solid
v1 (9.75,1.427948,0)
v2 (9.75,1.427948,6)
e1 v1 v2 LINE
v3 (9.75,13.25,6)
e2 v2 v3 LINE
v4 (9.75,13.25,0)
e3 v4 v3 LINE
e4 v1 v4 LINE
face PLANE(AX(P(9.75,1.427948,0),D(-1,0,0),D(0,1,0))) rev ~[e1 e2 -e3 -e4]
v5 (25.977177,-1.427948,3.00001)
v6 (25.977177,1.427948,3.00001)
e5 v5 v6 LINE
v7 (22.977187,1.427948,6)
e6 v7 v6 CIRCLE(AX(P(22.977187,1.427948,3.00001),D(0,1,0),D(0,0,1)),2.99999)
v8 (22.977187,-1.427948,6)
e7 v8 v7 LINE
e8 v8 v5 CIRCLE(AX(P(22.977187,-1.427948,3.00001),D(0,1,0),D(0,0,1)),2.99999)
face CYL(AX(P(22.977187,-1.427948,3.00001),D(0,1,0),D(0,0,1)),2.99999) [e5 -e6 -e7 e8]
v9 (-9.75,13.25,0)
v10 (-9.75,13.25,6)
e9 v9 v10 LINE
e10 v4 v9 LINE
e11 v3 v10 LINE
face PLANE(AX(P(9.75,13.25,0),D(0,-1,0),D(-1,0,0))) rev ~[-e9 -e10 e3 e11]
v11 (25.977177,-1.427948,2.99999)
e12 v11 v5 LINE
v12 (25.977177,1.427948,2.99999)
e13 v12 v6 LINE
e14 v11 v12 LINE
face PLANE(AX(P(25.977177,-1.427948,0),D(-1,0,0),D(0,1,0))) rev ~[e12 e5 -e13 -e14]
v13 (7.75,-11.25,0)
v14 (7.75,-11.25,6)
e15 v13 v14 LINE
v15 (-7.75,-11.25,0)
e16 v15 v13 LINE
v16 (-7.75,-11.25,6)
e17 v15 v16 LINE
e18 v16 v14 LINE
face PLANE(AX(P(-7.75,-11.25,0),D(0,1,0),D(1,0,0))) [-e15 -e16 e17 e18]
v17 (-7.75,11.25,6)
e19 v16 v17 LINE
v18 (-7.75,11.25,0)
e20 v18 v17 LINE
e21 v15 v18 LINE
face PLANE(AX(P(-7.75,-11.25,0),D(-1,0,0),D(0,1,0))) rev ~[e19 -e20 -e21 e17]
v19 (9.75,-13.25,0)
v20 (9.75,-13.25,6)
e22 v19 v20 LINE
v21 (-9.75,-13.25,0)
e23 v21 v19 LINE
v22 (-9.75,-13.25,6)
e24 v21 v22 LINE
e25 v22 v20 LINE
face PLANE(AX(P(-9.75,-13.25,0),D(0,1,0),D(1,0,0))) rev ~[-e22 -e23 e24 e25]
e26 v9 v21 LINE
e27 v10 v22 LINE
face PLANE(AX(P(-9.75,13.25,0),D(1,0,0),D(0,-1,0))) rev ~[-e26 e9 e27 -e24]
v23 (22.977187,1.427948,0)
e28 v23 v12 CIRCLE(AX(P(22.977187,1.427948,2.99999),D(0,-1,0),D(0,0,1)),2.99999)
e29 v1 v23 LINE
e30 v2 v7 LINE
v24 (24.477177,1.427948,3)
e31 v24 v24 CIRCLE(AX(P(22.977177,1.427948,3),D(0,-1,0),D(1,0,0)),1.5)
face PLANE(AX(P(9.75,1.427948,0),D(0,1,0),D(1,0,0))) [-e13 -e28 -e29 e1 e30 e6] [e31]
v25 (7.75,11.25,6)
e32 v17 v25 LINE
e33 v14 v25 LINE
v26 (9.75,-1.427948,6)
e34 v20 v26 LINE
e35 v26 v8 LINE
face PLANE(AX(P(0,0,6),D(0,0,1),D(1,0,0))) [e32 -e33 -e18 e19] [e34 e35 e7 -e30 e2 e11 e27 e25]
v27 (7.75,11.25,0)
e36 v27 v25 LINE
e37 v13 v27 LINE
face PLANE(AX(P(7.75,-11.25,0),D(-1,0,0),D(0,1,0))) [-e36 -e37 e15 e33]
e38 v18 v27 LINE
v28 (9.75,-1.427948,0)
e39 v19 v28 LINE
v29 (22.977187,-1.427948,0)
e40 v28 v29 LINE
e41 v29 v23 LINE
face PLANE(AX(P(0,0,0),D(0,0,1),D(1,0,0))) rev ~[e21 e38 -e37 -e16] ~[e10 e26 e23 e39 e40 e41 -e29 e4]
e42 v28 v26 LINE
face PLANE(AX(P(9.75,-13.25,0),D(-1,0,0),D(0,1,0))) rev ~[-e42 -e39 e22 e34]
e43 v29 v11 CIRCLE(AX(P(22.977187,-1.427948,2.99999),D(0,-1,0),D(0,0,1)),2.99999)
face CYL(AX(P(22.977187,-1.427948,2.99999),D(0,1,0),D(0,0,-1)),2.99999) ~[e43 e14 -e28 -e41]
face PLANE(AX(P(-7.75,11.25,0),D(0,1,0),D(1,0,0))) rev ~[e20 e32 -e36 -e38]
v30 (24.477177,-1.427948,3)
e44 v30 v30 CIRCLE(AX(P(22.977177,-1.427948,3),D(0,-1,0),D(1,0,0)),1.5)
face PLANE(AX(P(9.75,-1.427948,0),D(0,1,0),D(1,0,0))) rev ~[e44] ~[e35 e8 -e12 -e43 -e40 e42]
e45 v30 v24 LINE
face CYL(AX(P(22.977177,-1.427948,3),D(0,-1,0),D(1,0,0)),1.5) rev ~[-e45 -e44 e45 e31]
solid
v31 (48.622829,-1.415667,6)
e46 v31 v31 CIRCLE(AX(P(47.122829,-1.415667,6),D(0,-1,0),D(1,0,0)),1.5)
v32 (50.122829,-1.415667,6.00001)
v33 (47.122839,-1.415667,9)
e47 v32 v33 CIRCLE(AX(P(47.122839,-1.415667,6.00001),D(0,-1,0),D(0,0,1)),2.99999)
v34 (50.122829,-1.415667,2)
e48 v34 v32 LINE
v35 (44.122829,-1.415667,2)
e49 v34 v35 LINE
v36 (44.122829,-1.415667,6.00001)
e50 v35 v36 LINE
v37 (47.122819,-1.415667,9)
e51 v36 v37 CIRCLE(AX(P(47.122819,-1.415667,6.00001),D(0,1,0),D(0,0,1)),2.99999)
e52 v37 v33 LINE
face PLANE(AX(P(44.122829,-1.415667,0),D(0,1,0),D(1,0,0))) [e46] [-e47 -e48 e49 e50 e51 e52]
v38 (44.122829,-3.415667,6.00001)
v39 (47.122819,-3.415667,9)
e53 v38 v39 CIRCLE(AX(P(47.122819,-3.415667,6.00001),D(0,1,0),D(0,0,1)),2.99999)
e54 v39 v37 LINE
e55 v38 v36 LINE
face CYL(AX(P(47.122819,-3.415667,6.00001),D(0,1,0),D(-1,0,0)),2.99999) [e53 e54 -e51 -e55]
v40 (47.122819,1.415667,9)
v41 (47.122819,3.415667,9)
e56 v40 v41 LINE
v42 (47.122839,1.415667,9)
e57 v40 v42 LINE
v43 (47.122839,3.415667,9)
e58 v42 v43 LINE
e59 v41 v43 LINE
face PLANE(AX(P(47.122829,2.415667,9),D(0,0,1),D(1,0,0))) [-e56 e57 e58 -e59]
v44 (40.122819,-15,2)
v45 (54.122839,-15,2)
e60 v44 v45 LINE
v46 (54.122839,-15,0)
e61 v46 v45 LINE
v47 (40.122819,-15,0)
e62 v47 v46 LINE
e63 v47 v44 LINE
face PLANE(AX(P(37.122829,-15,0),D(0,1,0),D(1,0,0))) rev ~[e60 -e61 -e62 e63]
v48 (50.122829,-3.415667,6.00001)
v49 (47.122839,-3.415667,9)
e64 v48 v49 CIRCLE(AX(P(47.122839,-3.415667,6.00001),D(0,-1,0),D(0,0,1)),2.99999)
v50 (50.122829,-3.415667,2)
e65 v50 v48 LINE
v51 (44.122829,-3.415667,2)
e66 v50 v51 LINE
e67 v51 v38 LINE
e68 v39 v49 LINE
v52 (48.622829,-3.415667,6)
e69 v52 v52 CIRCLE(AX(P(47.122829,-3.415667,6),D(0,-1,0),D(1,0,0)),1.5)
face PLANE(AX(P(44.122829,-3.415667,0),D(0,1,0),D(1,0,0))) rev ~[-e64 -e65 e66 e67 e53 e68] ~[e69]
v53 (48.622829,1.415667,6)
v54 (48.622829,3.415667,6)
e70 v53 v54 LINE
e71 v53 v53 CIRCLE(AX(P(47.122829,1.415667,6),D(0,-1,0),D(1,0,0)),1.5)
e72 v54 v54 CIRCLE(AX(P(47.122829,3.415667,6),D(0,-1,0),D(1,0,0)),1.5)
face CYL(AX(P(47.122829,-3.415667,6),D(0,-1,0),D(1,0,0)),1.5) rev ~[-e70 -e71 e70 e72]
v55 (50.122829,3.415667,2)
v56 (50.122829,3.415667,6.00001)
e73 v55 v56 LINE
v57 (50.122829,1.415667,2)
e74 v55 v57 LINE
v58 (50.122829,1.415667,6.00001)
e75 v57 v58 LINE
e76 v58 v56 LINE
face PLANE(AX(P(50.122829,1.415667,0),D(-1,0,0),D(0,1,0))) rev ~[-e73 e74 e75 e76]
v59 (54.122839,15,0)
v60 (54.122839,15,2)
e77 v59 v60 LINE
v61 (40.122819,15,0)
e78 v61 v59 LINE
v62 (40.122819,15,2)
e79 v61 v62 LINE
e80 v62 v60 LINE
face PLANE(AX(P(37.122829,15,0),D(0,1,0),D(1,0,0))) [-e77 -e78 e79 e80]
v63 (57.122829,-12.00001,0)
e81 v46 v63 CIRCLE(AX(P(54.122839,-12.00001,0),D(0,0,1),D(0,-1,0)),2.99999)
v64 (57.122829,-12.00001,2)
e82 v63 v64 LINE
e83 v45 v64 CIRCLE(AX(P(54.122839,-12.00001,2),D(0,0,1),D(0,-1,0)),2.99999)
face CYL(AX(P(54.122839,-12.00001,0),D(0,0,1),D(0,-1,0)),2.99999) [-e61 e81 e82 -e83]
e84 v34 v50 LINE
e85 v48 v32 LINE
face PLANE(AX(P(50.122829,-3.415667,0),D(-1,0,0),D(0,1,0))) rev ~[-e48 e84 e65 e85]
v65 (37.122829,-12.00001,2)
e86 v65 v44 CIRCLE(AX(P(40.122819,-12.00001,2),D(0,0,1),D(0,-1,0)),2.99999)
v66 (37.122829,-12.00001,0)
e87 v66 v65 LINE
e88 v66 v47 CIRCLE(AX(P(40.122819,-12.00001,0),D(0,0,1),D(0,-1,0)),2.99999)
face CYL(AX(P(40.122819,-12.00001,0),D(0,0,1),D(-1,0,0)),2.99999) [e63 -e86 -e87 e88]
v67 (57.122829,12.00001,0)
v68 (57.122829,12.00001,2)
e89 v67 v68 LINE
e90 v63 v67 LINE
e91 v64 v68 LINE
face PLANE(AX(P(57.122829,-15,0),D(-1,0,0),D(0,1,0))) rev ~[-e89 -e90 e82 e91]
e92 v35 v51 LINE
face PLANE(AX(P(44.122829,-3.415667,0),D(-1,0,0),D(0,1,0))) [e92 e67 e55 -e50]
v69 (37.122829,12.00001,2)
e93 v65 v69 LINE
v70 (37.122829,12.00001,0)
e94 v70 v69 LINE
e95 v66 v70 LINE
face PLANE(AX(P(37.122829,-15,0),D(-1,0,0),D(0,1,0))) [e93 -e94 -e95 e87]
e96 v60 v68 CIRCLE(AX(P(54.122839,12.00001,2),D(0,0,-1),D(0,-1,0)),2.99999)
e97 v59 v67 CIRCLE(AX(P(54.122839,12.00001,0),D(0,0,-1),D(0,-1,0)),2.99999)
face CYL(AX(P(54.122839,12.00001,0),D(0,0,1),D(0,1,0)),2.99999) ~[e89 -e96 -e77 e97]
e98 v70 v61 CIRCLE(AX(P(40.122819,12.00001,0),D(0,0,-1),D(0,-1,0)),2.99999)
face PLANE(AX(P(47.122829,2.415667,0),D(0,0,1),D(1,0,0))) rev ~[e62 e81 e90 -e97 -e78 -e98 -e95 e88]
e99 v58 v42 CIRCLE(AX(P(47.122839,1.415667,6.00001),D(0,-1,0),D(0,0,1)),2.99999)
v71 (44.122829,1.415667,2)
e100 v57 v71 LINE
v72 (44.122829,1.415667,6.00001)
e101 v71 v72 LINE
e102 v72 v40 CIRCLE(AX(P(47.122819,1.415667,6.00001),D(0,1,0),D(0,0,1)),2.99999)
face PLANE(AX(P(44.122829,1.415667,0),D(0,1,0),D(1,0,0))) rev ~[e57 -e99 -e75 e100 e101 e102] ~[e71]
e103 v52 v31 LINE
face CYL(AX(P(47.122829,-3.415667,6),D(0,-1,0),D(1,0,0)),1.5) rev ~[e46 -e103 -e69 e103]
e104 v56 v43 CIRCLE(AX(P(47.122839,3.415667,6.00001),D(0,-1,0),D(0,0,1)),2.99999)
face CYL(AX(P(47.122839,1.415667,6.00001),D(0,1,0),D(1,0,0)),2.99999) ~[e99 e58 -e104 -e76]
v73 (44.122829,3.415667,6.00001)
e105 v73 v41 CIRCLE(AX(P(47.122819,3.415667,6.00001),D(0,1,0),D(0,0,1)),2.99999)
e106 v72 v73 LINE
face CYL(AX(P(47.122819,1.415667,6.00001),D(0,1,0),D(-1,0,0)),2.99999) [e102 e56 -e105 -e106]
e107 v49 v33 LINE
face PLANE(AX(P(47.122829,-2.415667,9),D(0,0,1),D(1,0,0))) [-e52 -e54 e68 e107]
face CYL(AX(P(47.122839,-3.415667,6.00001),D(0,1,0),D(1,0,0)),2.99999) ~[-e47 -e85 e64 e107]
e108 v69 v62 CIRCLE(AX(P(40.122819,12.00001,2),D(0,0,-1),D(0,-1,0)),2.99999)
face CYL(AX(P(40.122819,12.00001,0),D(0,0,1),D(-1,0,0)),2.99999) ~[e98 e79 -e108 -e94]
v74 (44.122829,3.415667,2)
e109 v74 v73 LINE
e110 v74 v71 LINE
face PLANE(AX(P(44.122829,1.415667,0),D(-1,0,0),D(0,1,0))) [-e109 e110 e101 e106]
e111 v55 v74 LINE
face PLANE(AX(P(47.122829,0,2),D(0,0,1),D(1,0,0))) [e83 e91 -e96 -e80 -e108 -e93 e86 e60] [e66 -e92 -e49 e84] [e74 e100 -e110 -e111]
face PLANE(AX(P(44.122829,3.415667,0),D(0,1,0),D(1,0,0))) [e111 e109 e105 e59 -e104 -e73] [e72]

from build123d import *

# Parameters (mm, degrees)
F0_W     = 15.5
F0_H     = 22.5
F0_W_2   = 16.2271768153
F0_H_2   = 2.8558950871
F1_DEPTH = 6
F2_R     = 1.5
F3_DEPTH = 25
F4_W     = 20
F4_H     = 30
F4_W_2   = 6
F4_H_2   = 2
F5_DEPTH = 2
F6_DEPTH = 9
F7_R     = 2.99999
F7_2_R   = 2.99999
F8_R     = 1.5
F9_DEPTH = 25


# Not quite as in the source:
# - a fillet or chamfer is up to 0.001 mm smaller than in the source, because OpenCascade refuses the exact size


with BuildPart() as f1:
    # F0 (on Top) → F1 (new body)
    with BuildSketch(Plane.XY):
        Polygon((-9.75, -13.25), (9.75, -13.25), (9.75, -1.4279475436), (9.75, 1.4279475436), (9.75, 13.25), (-9.75, 13.25), align=None)
        Rectangle(F0_W, F0_H, mode=Mode.SUBTRACT)
        with Locations((17.8635884076, 0)):
            Rectangle(F0_W_2, F0_H_2)
    extrude(amount=F1_DEPTH)

    # F2 (on face) → F3 (cut)
    with BuildSketch(Plane.XZ.offset(1.4279475436)):
        with Locations((22.9771768153, 3)):
            Circle(F2_R)
    extrude(amount=-F3_DEPTH, mode=Mode.SUBTRACT)

    # F7 (radius 3 in the source; OpenCascade refuses exactly that, so slightly less here)
    f7_edges = [f1.edges().sort_by_distance(p)[0] for p in [
        (25.977177, 0, 0),
        (25.977177, 0, 6),
    ]]
    fillet(f7_edges, radius=F7_R)


with BuildPart() as f5:
    # F4 (on Top) → F5 (new body)
    with BuildSketch(Plane.XY):
        with Locations((47.1228286624, 0)):
            Rectangle(F4_W, F4_H)
        with Locations((47.1228286624, -2.4156674554)):
            Rectangle(F4_W_2, F4_H_2, mode=Mode.SUBTRACT)
        with Locations((47.1228286624, 2.4156674554)):
            Rectangle(F4_W_2, F4_H_2, mode=Mode.SUBTRACT)
        with Locations((47.1228286624, 2.4156674554)):
            Rectangle(F4_W_2, F4_H_2)
        with Locations((47.1228286624, -2.4156674554)):
            Rectangle(F4_W_2, F4_H_2)
    extrude(amount=F5_DEPTH)

    # F4 (on Top) → F6 (join)
    with BuildSketch(Plane.XY):
        with Locations((47.1228286624, 2.4156674554)):
            Rectangle(F4_W_2, F4_H_2)
        with Locations((47.1228286624, -2.4156674554)):
            Rectangle(F4_W_2, F4_H_2)
    extrude(amount=F6_DEPTH)

    # F7#2 (radius 3 in the source; OpenCascade refuses exactly that, so slightly less here)
    f7_2_edges = [f5.edges().sort_by_distance(p)[0] for p in [
        (44.122829, 2.415667, 9),
        (44.122829, -2.415667, 9),
        (50.122829, 2.415667, 9),
        (50.122829, -2.415667, 9),
        (37.122829, -15, 1),
        (57.122829, -15, 1),
        (57.122829, 15, 1),
        (37.122829, 15, 1),
    ]]
    fillet(f7_2_edges, radius=F7_2_R)

    # F8 (on face) → F9 (cut)
    with BuildSketch(Plane.XZ.offset(3.4156674554)):
        with Locations((47.1228286624, 6)):
            Circle(F8_R)
    extrude(amount=-F9_DEPTH, mode=Mode.SUBTRACT)


solid = Compound([f1.part, f5.part])
